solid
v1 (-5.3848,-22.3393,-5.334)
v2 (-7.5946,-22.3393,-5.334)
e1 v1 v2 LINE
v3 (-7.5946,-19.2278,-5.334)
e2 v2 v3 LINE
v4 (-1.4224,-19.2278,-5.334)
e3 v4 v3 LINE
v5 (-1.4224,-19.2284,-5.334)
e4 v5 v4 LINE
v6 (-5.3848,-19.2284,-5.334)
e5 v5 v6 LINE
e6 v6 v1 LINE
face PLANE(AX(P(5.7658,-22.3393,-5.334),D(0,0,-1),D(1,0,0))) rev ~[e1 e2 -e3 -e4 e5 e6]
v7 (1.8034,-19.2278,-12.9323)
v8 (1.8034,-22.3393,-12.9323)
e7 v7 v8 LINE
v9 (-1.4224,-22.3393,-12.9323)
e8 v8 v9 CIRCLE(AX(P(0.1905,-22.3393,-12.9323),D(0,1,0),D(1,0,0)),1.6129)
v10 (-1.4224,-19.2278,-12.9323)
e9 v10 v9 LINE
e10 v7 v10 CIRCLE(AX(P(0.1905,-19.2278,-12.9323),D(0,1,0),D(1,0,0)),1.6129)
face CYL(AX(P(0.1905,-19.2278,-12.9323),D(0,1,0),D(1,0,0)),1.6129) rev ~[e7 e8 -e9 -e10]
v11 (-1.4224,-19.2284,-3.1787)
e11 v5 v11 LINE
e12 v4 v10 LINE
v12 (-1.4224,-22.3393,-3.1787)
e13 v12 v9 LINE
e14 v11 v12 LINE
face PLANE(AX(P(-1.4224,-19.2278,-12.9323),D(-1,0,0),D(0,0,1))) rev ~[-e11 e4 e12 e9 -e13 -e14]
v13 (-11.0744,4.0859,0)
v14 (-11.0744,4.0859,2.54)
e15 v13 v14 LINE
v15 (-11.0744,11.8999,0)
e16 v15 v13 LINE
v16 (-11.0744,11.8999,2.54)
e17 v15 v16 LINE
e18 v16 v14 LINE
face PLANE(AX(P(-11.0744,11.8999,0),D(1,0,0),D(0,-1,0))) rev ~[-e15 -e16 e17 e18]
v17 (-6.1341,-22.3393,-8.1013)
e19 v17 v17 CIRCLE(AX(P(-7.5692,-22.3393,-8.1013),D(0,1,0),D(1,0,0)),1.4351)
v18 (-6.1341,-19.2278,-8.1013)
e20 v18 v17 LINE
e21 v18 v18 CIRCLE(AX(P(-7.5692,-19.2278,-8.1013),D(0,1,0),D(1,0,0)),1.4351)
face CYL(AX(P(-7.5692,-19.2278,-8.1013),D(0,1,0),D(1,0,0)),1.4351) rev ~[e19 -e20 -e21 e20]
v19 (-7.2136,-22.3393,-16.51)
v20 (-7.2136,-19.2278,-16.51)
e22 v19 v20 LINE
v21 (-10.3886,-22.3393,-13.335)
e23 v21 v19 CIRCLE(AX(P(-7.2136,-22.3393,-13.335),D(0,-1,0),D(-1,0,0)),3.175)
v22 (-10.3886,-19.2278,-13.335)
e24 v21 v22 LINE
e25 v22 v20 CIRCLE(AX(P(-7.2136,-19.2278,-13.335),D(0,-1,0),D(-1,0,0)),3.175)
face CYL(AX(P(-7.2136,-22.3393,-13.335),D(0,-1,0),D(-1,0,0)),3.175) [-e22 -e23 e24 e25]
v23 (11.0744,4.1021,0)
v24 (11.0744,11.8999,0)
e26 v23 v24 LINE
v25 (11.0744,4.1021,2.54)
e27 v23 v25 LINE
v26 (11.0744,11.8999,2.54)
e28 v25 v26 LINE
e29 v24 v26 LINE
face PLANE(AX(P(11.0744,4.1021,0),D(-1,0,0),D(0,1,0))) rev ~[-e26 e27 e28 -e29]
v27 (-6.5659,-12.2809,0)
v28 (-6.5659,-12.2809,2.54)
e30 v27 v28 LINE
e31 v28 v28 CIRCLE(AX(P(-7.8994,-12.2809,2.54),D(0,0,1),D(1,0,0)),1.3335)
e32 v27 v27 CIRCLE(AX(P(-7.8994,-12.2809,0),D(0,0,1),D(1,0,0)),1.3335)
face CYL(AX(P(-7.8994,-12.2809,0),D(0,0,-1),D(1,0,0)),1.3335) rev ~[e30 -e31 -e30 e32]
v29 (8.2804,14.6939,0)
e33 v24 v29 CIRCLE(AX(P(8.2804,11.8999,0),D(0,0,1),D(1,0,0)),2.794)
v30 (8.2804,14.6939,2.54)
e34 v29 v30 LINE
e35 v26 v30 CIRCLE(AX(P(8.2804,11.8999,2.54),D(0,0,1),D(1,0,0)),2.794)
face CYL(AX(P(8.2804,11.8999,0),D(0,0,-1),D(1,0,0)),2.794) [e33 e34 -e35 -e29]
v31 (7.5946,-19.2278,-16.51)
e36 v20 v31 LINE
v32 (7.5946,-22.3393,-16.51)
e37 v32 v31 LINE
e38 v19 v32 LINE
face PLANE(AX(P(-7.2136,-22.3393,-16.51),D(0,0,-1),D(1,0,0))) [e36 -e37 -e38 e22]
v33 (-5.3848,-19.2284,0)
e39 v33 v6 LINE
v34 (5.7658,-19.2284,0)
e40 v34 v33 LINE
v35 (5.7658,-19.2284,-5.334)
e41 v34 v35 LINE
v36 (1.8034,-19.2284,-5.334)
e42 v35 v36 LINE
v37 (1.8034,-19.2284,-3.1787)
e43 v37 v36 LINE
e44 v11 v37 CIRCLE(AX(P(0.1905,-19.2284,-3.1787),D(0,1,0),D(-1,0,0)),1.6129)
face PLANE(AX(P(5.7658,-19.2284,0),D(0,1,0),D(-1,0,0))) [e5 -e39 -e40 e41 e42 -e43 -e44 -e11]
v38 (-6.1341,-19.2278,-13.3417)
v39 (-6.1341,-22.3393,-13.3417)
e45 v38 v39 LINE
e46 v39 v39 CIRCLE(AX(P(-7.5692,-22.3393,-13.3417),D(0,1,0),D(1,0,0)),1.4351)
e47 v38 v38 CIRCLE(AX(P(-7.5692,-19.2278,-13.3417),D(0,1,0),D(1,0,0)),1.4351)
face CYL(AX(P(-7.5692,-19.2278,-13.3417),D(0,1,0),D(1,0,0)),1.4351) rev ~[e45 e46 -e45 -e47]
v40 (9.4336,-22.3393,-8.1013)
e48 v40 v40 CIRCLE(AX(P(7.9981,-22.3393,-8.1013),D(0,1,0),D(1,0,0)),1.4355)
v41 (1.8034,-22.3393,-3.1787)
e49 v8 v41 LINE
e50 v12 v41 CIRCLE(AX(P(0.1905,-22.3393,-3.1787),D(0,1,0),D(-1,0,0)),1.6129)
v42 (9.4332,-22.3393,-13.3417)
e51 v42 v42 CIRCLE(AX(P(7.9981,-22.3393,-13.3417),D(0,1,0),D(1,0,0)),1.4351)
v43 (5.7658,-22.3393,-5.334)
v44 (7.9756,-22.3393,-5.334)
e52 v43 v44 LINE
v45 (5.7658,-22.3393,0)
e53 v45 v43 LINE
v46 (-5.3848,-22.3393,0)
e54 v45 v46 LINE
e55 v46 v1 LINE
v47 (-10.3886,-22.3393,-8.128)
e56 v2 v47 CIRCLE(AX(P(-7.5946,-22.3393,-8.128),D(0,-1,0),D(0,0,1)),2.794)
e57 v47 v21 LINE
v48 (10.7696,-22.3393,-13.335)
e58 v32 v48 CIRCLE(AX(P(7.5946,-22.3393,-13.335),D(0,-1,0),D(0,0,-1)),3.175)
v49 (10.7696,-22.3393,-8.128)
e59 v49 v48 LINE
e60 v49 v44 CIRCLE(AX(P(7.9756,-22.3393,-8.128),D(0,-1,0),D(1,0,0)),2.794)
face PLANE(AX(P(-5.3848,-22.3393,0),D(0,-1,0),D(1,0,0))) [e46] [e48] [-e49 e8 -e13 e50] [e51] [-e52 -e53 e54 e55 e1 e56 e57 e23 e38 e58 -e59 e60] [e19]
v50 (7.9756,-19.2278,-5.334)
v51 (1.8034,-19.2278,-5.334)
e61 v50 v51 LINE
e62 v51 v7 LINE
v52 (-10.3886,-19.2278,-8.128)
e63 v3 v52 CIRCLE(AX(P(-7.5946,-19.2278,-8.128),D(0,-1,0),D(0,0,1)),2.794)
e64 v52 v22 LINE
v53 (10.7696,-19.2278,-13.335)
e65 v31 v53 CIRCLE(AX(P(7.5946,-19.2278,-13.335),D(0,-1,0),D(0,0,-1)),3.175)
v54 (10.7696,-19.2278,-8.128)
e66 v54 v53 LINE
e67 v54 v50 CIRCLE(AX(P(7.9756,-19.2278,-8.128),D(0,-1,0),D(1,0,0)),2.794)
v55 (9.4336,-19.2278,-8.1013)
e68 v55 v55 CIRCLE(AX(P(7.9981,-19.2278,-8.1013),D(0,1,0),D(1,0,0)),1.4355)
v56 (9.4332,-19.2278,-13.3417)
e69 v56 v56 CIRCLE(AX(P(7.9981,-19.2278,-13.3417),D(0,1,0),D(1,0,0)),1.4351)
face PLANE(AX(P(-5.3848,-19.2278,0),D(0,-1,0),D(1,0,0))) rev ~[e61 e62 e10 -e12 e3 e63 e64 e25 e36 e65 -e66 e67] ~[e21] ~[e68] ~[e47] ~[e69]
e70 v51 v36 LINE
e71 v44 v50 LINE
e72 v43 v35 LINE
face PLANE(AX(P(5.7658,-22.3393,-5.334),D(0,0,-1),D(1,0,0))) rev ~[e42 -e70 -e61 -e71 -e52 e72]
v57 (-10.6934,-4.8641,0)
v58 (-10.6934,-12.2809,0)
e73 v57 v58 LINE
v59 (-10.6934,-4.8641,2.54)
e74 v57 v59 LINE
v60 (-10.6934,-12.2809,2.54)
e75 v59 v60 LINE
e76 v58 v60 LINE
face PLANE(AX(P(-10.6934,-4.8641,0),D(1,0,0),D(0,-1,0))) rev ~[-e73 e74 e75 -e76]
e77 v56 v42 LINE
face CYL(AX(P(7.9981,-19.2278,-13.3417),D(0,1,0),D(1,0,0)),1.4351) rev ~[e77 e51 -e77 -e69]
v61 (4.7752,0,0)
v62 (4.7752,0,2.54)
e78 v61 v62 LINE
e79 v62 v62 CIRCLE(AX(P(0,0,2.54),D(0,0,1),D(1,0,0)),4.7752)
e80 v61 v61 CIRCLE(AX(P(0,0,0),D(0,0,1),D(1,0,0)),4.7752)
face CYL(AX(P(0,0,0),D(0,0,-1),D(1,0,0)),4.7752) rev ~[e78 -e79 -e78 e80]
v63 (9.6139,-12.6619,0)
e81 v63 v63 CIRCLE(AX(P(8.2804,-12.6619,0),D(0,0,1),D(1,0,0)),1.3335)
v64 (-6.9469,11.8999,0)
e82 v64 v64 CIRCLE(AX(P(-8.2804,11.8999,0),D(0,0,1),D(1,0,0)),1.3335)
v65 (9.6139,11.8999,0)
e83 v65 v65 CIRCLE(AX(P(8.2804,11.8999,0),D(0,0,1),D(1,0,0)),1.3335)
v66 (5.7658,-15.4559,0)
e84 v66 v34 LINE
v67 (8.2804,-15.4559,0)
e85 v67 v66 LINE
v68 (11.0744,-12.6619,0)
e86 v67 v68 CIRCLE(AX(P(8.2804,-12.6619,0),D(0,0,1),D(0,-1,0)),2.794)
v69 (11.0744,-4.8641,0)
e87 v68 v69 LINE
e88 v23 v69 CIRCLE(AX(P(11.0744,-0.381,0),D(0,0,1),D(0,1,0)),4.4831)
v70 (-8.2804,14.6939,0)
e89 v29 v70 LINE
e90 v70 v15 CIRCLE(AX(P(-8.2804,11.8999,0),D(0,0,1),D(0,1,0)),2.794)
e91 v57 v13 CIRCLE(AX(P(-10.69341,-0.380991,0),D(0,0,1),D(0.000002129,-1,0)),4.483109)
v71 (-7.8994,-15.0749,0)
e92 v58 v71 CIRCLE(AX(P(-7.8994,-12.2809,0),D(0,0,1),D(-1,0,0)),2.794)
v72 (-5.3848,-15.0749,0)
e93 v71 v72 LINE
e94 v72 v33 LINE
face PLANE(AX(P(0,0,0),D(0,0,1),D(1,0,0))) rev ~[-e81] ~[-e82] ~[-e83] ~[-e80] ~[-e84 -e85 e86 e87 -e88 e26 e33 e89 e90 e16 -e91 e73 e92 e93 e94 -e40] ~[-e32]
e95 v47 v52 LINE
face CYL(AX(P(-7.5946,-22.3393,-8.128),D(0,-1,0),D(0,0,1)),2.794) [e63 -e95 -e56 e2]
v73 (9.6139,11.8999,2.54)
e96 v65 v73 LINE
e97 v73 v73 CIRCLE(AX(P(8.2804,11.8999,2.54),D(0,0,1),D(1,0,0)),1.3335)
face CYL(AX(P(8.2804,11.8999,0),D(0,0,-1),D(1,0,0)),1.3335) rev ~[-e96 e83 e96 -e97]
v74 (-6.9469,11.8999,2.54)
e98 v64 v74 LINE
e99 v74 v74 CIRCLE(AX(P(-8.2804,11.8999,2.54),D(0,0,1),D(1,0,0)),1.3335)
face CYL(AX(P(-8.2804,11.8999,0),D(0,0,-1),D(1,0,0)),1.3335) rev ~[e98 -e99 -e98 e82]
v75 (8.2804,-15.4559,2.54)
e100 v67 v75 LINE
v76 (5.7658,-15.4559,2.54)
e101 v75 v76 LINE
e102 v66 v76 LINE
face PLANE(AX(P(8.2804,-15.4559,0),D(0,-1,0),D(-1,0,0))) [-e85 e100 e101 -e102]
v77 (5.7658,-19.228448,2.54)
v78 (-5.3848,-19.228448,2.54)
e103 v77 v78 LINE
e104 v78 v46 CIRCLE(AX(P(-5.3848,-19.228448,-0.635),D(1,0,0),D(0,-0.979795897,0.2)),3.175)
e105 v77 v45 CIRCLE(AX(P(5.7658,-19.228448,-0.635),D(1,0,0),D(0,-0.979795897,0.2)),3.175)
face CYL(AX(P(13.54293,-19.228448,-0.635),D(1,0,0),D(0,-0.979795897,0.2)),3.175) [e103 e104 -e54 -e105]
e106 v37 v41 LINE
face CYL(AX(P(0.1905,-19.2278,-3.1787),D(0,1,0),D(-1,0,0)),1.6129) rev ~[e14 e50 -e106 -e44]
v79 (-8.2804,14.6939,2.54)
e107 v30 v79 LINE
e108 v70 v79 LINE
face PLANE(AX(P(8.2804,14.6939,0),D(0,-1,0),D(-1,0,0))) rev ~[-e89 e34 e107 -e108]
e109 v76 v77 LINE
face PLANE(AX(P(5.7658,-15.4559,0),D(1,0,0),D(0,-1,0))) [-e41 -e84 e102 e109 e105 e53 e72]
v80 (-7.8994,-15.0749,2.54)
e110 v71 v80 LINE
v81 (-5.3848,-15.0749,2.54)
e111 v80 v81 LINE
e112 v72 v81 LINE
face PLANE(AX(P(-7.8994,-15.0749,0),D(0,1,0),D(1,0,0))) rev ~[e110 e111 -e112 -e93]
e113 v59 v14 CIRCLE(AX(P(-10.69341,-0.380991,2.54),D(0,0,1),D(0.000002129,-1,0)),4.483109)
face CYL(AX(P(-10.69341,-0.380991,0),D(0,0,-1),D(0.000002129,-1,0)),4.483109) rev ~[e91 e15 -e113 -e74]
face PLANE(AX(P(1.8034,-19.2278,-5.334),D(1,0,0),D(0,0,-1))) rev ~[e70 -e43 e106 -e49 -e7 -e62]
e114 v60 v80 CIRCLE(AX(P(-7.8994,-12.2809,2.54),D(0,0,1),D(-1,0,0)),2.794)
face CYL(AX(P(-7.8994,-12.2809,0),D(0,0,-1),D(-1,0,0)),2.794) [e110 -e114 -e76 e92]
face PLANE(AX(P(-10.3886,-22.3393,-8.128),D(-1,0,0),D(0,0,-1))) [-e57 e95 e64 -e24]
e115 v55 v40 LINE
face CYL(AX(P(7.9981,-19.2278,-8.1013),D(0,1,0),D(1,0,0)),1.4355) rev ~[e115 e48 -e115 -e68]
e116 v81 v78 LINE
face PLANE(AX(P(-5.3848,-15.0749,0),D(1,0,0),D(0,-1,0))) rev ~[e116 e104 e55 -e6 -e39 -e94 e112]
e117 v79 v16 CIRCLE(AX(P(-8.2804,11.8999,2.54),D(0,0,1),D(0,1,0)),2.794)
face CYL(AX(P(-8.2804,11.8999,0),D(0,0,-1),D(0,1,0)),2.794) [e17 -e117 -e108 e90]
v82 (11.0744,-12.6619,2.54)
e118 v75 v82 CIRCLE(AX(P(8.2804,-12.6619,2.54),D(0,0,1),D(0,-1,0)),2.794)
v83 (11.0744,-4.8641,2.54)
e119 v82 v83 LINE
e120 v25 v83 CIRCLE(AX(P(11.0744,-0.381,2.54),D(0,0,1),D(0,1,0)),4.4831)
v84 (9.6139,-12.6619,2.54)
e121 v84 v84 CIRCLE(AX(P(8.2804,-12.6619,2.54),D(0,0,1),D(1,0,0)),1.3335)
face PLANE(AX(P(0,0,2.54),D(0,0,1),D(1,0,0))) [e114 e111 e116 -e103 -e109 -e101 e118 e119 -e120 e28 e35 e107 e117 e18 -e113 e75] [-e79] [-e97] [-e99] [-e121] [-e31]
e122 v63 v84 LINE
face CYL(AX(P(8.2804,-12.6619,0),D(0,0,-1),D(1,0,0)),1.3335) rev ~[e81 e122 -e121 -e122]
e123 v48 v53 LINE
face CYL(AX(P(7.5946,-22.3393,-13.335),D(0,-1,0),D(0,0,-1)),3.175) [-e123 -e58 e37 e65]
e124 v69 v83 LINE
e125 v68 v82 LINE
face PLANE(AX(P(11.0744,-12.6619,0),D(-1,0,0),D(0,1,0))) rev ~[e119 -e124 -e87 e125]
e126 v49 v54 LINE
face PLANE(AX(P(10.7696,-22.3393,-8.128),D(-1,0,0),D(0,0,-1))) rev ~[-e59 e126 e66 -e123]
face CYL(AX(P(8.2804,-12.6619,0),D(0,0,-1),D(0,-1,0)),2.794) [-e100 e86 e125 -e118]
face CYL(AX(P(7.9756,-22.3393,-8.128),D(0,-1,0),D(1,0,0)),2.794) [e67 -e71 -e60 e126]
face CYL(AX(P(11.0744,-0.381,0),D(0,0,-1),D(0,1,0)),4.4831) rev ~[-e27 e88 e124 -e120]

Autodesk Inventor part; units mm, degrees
ref_plane "YZ Plane" through (0, 0, 0) normal (1, 0, 0) x (0, 1, 0)
ref_plane "XZ Plane" through (0, 0, 0) normal (0, 1, 0) x (-1, 0, 0)
ref_plane "XY Plane" through (0, 0, 0) normal (0, 0, 1) x (1, 0, 0)
sketch "Sketch1" plane through (0, 0, 0) normal (0, 0, 1) x (1, 0, 0)
  line L0 (8.2804, 14.6939) -> (-8.2804, 14.6939)
  circle A0 centre (0, 0) radius 4.7752
  line L1 (-7.8994, -15.0749) -> (-5.3848, -15.0749)
  line L2 (-5.3848, -15.0749) -> (-5.3848, -22.3393)
  line L3 (8.2804, -15.4559) -> (5.7658, -15.4559)
  line L4 (5.7658, -15.4559) -> (5.7658, -22.3393)
  line L5 (5.7658, -22.3393) -> (-5.3848, -22.3393)
  arc A1 (-10.6934, -4.8641) -> (-11.0744, 4.0859) centre (-10.6934, -0.381) ccw
  line L6 (-11.0744, 11.8999) -> (-11.0744, 4.0859)
  line L7 (-10.6934, -4.8641) -> (-10.6934, -12.2809)
  arc A2 (11.0744, 4.1021) -> (11.0744, -4.8641) centre (11.0744, -0.381) ccw
  line L8 (11.0744, -12.6619) -> (11.0744, -4.8641)
  line L9 (11.0744, 4.1021) -> (11.0744, 11.8999)
  arc A3 (-8.2804, 14.6939) -> (-11.0744, 11.8999) centre (-8.2804, 11.8999) ccw
  arc A4 (11.0744, 11.8999) -> (8.2804, 14.6939) centre (8.2804, 11.8999) ccw
  arc A5 (8.2804, -15.4559) -> (11.0744, -12.6619) centre (8.2804, -12.6619) ccw
  arc A6 (-10.6934, -12.2809) -> (-7.8994, -15.0749) centre (-7.8994, -12.2809) ccw
  circle A7 centre (-8.2804, 11.8999) radius 1.3335
  circle A8 centre (8.2804, 11.8999) radius 1.3335
  circle A9 centre (8.2804, -12.6619) radius 1.3335
  circle A10 centre (-7.8994, -12.2809) radius 1.3335
  point P0 (-10.6934, -15.0749)
  point P1 (11.0744, 14.6939)
  point P2 (11.0744, -15.4559)
  point P3 (-11.0744, 14.6939)
  dimension "d0" = 30.1498
  dimension "d1" = 22.1488
  dimension "d2" = 9.5504
  dimension "d3" = 5.3086
  dimension "d4" = 7.2644
  dimension "d5" = 5.3086
  dimension "d6" = 8.9662
  dimension "d7" = 8.9662
  dimension "d11" = 2.794
  dimension "d12" = 2.667
  dimension "d13" = 2.667
  dimension "d14" = 2.667
  dimension "d15" = 2.667
extrude "Extrusion1" add sketch "Sketch1" along normal blind 2.54
fillet "Fillet1" radius 3.175 1 edges at (0.1905, -22.3393, 2.54)
sketch "Sketch2" plane through (0, 0, 0) normal (0, 0, -1) x (-1, 0, 0)
  line L0 (-5.7658, -19.2284) -> (5.3848, -19.2284) projected
  line L1 (-5.7658, -19.2284) -> (5.3848, -19.2284)
  line L2 (-5.7658, -22.3393) -> (-5.7658, -19.2284) projected
  line L3 (-5.7658, -19.2284) -> (-5.7658, -22.3393)
  line L4 (-5.7658, -22.3393) -> (5.3848, -22.3393) projected
  line L5 (-5.7658, -22.3393) -> (5.3848, -22.3393)
  line L6 (5.3848, -19.2284) -> (5.3848, -22.3393) projected
  line L7 (5.3848, -22.3393) -> (5.3848, -19.2284)
  point P0 (0, 0)
extrude "Extrusion2" add sketch "Sketch2" along normal blind 5.334
sketch "Sketch6" plane through (-5.3848, -22.3393, 0) normal (0, -1, 0) x (1, 0, 0)
  line L0 (11.1506, -5.334) -> (13.3604, -5.334)
  line L1 (16.1544, -8.128) -> (16.1544, -13.335)
  line L2 (0, -5.334) -> (-2.2098, -5.334)
  line L3 (-5.0038, -8.128) -> (-5.0038, -13.335)
  line L4 (-1.8288, -16.51) -> (12.9794, -16.51)
  line L5 (0, -5.334) -> (11.1506, -5.334) projected
  line L6 (0, -5.334) -> (11.1506, -5.334)
  arc A0 (12.9794, -16.51) -> (16.1544, -13.335) centre (12.9794, -13.335) ccw
  arc A1 (-5.0038, -13.335) -> (-1.8288, -16.51) centre (-1.8288, -13.335) ccw
  arc A2 (16.1544, -8.128) -> (13.3604, -5.334) centre (13.3604, -8.128) ccw
  arc A3 (-2.2098, -5.334) -> (-5.0038, -8.128) centre (-2.2098, -8.128) ccw
  point P0 (5.3848, 0)
  point P1 (16.1544, -5.334)
  point P2 (16.1544, -16.51)
  point P3 (-5.0038, -5.334)
  point P4 (-5.0038, -16.51)
  dimension "d30" = 5.0038
  dimension "d32" = 5.0038
  dimension "d35" = 3.175
  dimension "d36" = 2.794
extrude "Extrusion3" add sketch "Sketch6" against normal blind 3.1115
sketch "Sketch7" plane through (-5.3848, -19.2278, 0) normal (0, 1, 0) x (1, 0, 0)
  line L0 (0, 5.334) -> (11.1506, 5.334) projected
  line L1 (-1.8288, 16.51) -> (12.9794, 16.51) projected
  line L2 (3.9624, 12.9323) -> (3.9624, 3.1787)
  line L3 (7.1882, 3.1787) -> (7.1882, 12.9323)
  arc A0 (7.1882, 12.9323) -> (3.9624, 12.9323) centre (5.5753, 12.9323) ccw
  arc A1 (3.9624, 3.1787) -> (7.1882, 3.1787) centre (5.5753, 3.1787) ccw
  point P0 (5.3848, 0)
  point P1 (5.5753, 8.0555)
  dimension "d37" = 9.7536
  dimension "d38" = 3.2258
extrude "Extrusion4" cut sketch "Sketch7" against normal blind 76.2
sketch "Sketch8" plane through (-5.3848, -19.2278, 0) normal (0, 1, 0) x (1, 0, 0)
  circle A0 centre (13.3829, 13.3417) radius 1.4351
  circle A1 centre (13.3829, 8.1013) radius 1.4355
  circle A2 centre (-2.1844, 8.1013) radius 1.4351
  circle A3 centre (-2.1844, 13.3417) radius 1.4351
  point P0 (5.3848, 0)
  dimension "d48" = 2.8702
  dimension "d49" = 2.8702
  dimension "d50" = 2.8702
extrude "Extrusion5" cut sketch "Sketch8" against normal blind 76.2
properties part number "cwmotorholder"
